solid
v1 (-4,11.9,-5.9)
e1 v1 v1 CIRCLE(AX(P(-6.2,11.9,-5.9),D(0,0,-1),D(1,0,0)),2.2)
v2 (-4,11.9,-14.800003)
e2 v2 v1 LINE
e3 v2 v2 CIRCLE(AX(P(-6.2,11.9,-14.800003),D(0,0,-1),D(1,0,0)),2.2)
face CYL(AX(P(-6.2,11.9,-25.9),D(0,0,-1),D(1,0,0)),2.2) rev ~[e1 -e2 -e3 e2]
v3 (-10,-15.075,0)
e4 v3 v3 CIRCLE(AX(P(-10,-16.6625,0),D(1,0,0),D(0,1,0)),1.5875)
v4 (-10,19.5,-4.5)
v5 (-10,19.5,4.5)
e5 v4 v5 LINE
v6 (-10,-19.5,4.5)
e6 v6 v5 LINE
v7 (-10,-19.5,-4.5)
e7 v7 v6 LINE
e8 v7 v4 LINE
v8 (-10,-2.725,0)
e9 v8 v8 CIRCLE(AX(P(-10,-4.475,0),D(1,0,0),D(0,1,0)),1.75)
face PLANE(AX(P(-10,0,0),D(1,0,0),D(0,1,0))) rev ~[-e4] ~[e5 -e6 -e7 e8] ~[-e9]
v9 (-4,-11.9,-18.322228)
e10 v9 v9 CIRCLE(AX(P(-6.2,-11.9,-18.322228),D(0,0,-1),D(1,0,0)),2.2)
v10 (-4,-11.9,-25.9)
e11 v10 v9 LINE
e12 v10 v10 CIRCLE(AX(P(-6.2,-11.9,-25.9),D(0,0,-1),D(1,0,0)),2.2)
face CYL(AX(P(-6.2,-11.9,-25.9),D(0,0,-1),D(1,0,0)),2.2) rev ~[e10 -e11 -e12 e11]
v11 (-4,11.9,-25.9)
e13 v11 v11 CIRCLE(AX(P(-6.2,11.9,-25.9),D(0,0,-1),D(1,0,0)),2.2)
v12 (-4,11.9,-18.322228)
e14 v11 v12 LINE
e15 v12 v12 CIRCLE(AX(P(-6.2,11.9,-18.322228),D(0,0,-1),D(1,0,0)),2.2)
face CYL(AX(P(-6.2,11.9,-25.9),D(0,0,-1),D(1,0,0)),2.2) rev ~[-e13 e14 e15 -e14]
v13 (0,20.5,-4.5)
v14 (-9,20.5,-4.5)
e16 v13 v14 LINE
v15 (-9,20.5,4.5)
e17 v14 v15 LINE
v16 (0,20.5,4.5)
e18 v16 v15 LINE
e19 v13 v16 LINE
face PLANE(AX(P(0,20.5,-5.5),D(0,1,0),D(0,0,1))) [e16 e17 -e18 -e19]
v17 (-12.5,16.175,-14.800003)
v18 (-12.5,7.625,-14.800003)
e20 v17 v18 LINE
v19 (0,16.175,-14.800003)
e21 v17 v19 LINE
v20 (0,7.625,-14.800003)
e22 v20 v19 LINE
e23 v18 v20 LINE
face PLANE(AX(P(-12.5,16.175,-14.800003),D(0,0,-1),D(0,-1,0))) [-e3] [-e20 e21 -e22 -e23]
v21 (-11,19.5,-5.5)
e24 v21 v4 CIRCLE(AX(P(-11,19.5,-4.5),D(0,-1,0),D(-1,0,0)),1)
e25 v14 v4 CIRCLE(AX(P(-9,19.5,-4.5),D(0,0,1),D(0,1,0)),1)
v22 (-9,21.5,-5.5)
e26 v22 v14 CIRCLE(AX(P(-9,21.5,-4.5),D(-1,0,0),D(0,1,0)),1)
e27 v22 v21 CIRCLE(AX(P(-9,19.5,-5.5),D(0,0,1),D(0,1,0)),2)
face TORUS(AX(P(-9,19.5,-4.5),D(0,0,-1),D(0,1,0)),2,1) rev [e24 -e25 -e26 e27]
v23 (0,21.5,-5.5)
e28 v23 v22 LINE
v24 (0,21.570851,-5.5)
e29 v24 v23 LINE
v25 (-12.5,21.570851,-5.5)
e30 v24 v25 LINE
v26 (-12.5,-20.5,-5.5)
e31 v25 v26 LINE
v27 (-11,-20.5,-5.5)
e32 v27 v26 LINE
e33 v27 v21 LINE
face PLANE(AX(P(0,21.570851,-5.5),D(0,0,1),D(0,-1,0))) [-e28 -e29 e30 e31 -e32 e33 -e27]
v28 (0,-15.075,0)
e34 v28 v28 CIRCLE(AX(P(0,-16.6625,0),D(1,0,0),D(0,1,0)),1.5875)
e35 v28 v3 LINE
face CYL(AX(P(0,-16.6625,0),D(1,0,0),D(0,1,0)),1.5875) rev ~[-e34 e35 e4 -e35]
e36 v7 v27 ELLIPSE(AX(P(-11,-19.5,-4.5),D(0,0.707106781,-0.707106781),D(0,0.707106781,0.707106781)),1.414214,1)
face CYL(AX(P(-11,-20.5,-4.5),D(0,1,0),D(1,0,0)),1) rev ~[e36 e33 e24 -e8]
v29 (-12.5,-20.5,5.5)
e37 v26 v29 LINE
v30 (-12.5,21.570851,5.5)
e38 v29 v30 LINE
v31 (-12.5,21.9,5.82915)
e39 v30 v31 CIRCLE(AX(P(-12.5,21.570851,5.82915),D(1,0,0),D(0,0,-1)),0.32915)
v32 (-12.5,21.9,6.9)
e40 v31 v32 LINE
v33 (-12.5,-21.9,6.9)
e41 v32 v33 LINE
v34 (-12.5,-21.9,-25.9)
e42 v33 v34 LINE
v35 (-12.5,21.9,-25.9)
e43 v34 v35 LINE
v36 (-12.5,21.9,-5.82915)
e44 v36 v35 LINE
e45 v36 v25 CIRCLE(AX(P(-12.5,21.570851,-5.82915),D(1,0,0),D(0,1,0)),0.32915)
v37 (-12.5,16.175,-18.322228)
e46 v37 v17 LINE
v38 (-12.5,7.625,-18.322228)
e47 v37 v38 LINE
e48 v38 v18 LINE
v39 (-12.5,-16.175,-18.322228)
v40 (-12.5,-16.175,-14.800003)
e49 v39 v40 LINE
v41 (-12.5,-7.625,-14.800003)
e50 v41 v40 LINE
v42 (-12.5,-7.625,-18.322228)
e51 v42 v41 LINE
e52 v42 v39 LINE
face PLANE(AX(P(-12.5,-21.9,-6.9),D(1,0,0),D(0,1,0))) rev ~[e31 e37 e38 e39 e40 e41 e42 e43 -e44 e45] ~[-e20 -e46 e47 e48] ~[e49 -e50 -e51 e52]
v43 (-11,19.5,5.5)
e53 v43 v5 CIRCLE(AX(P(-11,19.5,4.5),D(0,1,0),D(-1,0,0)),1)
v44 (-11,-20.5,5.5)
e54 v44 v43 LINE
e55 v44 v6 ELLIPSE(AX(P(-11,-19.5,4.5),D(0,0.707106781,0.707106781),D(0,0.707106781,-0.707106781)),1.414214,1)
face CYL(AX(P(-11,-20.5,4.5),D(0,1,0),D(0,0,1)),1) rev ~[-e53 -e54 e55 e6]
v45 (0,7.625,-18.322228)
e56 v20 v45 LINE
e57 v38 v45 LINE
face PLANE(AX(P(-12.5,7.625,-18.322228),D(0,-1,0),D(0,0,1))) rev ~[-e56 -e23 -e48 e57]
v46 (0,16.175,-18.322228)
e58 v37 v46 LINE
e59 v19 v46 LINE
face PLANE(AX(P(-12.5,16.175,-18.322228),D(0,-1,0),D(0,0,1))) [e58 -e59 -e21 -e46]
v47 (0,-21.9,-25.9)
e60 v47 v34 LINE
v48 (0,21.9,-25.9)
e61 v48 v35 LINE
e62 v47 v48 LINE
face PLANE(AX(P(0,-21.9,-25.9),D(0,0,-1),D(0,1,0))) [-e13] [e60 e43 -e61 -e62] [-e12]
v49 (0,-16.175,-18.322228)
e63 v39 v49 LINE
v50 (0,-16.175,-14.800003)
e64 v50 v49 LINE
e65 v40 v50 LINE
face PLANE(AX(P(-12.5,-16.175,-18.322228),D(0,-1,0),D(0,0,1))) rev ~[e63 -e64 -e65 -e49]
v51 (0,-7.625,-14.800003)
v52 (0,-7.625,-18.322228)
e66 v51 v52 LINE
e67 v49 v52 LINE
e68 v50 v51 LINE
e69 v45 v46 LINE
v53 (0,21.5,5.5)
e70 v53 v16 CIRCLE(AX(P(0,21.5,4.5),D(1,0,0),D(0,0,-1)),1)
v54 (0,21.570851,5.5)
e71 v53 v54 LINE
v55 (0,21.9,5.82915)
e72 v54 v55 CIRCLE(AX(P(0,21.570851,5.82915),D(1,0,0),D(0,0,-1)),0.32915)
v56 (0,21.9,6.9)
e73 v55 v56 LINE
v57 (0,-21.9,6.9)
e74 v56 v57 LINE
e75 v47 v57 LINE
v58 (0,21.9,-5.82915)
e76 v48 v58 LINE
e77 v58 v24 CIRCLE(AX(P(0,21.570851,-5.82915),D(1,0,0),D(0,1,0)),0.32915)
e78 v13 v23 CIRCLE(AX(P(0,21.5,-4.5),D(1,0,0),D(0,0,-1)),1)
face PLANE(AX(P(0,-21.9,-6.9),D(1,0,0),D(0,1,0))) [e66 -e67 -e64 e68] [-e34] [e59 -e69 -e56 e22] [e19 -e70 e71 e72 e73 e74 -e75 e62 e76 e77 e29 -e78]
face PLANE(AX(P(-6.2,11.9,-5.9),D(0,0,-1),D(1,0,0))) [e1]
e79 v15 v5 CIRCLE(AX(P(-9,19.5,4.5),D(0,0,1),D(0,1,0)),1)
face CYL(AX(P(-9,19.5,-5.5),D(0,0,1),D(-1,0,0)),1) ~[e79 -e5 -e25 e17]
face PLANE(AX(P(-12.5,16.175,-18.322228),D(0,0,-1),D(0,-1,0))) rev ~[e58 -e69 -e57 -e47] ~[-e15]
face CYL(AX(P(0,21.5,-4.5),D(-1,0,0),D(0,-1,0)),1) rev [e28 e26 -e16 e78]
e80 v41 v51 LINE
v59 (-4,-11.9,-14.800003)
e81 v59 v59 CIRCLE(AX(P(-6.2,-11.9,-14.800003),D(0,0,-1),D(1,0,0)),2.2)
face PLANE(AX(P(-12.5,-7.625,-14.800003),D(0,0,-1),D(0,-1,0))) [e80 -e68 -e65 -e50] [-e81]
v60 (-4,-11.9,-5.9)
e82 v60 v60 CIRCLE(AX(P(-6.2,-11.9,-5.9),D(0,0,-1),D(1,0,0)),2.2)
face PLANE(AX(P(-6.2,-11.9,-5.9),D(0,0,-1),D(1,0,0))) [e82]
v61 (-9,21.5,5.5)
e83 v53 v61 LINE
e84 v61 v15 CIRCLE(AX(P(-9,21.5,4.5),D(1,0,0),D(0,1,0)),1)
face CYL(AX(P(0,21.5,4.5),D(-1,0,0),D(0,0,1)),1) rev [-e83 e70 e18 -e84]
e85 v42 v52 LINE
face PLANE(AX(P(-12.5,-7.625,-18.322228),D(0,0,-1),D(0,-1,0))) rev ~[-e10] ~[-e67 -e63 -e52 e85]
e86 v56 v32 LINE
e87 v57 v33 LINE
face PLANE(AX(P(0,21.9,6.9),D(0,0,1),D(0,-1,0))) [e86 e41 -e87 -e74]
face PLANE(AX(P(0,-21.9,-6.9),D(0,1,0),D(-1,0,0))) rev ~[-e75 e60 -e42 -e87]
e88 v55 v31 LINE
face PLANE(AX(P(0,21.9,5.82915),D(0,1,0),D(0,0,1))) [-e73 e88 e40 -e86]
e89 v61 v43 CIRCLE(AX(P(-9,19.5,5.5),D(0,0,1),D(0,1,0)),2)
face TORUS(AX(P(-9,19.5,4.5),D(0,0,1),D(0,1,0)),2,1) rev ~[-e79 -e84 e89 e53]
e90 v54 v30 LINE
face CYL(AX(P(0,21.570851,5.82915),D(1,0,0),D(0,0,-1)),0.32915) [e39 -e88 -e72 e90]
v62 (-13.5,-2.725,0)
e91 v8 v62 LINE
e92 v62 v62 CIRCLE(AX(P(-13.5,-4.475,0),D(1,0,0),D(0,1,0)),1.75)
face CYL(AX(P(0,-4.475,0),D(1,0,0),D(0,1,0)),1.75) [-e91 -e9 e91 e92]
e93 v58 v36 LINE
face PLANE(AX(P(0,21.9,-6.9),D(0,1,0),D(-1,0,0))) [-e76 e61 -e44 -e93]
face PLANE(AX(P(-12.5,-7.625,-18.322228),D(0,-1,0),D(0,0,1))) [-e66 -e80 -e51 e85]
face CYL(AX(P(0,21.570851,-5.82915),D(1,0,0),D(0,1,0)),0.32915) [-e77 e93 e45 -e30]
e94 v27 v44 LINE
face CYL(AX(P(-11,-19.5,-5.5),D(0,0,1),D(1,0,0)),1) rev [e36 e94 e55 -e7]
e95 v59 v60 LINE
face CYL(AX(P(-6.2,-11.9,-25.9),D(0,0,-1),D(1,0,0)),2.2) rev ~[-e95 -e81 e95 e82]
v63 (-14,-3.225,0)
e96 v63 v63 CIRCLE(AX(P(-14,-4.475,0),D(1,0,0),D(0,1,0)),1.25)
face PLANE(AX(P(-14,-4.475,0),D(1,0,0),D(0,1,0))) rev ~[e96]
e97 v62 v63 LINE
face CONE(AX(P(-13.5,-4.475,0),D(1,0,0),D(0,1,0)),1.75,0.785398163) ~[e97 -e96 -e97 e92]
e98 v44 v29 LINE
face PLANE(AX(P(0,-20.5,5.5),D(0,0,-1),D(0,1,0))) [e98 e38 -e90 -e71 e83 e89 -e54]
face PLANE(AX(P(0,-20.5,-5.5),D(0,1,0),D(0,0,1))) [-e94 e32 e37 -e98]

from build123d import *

# Parameters (mm, degrees)
F0_W      = 41
F0_H      = 11
F0_R      = 1.5875
F0_R_2    = 1.75
F1_DEPTH  = 10
F2_DEPTH  = 12.5
F3_R      = 1
F4_DEPTH  = 14
F5_SIZE   = 0.5
F6_DEPTH  = 19
F7_R      = 2.2
F8_DEPTH  = 20
F9_W      = 8.55
F9_H      = 3.5222247243
F10_DEPTH = 22.3


with BuildPart() as f1:
    # F0 (on Right) → F1 (new body)
    with BuildSketch(Plane.YZ):
        Rectangle(F0_W, F0_H)
        with Locations((-16.6625, 0)):
            Circle(F0_R, mode=Mode.SUBTRACT)
        with Locations((-4.475, 0)):
            Circle(F0_R_2, mode=Mode.SUBTRACT)
    extrude(amount=-F1_DEPTH)

    # F0 (on Right) → F2 (join)
    with BuildSketch(Plane.YZ):
        with BuildLine():
            Line((-20.5, 5.5), (20.5, 5.5))
            Line((20.5, 5.5), (21.5708505204, 5.5))
            ThreePointArc((21.5708505204, 5.5), (21.8035943853, 5.5964056654), (21.9000000507, 5.8291495303))
            Line((21.9000000507, 5.8291495303), (21.9000000507, 6.9000000507))
            Line((21.9000000507, 6.9000000507), (-21.9000000507, 6.9000000507))
            Line((-21.9000000507, 6.9000000507), (-21.9000000507, -6.9000000507))
            Line((-21.9000000507, -6.9000000507), (21.9000000507, -6.9000000507))
            Line((21.9000000507, -6.9000000507), (21.9000000507, -5.8291495303))
            ThreePointArc((21.9000000507, -5.8291495303), (21.8035943853, -5.5964056654), (21.5708505204, -5.5))
            Line((21.5708505204, -5.5), (20.5, -5.5))
            Line((20.5, -5.5), (-20.5, -5.5))
            Line((-20.5, -5.5), (-20.5, 5.5))
        make_face()
    extrude(amount=-F2_DEPTH)

    # F3
    f3_edges = [f1.edges().sort_by_distance(p)[0] for p in [
        (-10, 0, 5.5),
        (-10, -20.5, 0),
        (-10, 0, -5.5),
        (-10, 20.5, 0),
        (-5, 20.5, -5.5),
        (-5, 20.5, 5.5),
    ]]
    fillet(f3_edges, radius=F3_R)

    # F0 (on Right) → F4 (join)
    with BuildSketch(Plane.YZ):
        with Locations((-4.475, 0)):
            Circle(F0_R_2)
    extrude(amount=-F4_DEPTH)

    # F5
    f5_edges = [f1.edges().sort_by_distance(p)[0] for p in [
        (-14, -6.225, 0),
    ]]
    chamfer(f5_edges, length=F5_SIZE)

    # F6 (add): a face of the model
    f6_faces = [f1.faces().sort_by_distance(p)[0] for p in [
        (-6.25, 0, -6.9000000507),
    ]]
    extrude(f6_faces, amount=F6_DEPTH)

    # F7 (on face) → F8 (cut)
    with BuildSketch(Plane(origin=(0, 0, -25.9000000507), x_dir=(1, 0, 0), z_dir=(0, 0, -1))):
        with Locations((-6.1999997124, 11.8999998271)):
            Circle(F7_R)
        with Locations((-6.1999997124, -11.9000002742)):
            Circle(F7_R)
    extrude(amount=-F8_DEPTH, mode=Mode.SUBTRACT)

    # F9 (on face) → F10 (cut)
    with BuildSketch(Plane(origin=(-12.5, 0, 0), x_dir=(0, -1, 0), z_dir=(-1, 0, 0))):
        with Locations((-11.9000004627, -16.5611151606)):
            Rectangle(F9_W, F9_H)
        with Locations((11.9000000857, -16.5611151606)):
            Rectangle(F9_W, F9_H)
    extrude(amount=-F10_DEPTH, mode=Mode.SUBTRACT)


solid = f1.part
